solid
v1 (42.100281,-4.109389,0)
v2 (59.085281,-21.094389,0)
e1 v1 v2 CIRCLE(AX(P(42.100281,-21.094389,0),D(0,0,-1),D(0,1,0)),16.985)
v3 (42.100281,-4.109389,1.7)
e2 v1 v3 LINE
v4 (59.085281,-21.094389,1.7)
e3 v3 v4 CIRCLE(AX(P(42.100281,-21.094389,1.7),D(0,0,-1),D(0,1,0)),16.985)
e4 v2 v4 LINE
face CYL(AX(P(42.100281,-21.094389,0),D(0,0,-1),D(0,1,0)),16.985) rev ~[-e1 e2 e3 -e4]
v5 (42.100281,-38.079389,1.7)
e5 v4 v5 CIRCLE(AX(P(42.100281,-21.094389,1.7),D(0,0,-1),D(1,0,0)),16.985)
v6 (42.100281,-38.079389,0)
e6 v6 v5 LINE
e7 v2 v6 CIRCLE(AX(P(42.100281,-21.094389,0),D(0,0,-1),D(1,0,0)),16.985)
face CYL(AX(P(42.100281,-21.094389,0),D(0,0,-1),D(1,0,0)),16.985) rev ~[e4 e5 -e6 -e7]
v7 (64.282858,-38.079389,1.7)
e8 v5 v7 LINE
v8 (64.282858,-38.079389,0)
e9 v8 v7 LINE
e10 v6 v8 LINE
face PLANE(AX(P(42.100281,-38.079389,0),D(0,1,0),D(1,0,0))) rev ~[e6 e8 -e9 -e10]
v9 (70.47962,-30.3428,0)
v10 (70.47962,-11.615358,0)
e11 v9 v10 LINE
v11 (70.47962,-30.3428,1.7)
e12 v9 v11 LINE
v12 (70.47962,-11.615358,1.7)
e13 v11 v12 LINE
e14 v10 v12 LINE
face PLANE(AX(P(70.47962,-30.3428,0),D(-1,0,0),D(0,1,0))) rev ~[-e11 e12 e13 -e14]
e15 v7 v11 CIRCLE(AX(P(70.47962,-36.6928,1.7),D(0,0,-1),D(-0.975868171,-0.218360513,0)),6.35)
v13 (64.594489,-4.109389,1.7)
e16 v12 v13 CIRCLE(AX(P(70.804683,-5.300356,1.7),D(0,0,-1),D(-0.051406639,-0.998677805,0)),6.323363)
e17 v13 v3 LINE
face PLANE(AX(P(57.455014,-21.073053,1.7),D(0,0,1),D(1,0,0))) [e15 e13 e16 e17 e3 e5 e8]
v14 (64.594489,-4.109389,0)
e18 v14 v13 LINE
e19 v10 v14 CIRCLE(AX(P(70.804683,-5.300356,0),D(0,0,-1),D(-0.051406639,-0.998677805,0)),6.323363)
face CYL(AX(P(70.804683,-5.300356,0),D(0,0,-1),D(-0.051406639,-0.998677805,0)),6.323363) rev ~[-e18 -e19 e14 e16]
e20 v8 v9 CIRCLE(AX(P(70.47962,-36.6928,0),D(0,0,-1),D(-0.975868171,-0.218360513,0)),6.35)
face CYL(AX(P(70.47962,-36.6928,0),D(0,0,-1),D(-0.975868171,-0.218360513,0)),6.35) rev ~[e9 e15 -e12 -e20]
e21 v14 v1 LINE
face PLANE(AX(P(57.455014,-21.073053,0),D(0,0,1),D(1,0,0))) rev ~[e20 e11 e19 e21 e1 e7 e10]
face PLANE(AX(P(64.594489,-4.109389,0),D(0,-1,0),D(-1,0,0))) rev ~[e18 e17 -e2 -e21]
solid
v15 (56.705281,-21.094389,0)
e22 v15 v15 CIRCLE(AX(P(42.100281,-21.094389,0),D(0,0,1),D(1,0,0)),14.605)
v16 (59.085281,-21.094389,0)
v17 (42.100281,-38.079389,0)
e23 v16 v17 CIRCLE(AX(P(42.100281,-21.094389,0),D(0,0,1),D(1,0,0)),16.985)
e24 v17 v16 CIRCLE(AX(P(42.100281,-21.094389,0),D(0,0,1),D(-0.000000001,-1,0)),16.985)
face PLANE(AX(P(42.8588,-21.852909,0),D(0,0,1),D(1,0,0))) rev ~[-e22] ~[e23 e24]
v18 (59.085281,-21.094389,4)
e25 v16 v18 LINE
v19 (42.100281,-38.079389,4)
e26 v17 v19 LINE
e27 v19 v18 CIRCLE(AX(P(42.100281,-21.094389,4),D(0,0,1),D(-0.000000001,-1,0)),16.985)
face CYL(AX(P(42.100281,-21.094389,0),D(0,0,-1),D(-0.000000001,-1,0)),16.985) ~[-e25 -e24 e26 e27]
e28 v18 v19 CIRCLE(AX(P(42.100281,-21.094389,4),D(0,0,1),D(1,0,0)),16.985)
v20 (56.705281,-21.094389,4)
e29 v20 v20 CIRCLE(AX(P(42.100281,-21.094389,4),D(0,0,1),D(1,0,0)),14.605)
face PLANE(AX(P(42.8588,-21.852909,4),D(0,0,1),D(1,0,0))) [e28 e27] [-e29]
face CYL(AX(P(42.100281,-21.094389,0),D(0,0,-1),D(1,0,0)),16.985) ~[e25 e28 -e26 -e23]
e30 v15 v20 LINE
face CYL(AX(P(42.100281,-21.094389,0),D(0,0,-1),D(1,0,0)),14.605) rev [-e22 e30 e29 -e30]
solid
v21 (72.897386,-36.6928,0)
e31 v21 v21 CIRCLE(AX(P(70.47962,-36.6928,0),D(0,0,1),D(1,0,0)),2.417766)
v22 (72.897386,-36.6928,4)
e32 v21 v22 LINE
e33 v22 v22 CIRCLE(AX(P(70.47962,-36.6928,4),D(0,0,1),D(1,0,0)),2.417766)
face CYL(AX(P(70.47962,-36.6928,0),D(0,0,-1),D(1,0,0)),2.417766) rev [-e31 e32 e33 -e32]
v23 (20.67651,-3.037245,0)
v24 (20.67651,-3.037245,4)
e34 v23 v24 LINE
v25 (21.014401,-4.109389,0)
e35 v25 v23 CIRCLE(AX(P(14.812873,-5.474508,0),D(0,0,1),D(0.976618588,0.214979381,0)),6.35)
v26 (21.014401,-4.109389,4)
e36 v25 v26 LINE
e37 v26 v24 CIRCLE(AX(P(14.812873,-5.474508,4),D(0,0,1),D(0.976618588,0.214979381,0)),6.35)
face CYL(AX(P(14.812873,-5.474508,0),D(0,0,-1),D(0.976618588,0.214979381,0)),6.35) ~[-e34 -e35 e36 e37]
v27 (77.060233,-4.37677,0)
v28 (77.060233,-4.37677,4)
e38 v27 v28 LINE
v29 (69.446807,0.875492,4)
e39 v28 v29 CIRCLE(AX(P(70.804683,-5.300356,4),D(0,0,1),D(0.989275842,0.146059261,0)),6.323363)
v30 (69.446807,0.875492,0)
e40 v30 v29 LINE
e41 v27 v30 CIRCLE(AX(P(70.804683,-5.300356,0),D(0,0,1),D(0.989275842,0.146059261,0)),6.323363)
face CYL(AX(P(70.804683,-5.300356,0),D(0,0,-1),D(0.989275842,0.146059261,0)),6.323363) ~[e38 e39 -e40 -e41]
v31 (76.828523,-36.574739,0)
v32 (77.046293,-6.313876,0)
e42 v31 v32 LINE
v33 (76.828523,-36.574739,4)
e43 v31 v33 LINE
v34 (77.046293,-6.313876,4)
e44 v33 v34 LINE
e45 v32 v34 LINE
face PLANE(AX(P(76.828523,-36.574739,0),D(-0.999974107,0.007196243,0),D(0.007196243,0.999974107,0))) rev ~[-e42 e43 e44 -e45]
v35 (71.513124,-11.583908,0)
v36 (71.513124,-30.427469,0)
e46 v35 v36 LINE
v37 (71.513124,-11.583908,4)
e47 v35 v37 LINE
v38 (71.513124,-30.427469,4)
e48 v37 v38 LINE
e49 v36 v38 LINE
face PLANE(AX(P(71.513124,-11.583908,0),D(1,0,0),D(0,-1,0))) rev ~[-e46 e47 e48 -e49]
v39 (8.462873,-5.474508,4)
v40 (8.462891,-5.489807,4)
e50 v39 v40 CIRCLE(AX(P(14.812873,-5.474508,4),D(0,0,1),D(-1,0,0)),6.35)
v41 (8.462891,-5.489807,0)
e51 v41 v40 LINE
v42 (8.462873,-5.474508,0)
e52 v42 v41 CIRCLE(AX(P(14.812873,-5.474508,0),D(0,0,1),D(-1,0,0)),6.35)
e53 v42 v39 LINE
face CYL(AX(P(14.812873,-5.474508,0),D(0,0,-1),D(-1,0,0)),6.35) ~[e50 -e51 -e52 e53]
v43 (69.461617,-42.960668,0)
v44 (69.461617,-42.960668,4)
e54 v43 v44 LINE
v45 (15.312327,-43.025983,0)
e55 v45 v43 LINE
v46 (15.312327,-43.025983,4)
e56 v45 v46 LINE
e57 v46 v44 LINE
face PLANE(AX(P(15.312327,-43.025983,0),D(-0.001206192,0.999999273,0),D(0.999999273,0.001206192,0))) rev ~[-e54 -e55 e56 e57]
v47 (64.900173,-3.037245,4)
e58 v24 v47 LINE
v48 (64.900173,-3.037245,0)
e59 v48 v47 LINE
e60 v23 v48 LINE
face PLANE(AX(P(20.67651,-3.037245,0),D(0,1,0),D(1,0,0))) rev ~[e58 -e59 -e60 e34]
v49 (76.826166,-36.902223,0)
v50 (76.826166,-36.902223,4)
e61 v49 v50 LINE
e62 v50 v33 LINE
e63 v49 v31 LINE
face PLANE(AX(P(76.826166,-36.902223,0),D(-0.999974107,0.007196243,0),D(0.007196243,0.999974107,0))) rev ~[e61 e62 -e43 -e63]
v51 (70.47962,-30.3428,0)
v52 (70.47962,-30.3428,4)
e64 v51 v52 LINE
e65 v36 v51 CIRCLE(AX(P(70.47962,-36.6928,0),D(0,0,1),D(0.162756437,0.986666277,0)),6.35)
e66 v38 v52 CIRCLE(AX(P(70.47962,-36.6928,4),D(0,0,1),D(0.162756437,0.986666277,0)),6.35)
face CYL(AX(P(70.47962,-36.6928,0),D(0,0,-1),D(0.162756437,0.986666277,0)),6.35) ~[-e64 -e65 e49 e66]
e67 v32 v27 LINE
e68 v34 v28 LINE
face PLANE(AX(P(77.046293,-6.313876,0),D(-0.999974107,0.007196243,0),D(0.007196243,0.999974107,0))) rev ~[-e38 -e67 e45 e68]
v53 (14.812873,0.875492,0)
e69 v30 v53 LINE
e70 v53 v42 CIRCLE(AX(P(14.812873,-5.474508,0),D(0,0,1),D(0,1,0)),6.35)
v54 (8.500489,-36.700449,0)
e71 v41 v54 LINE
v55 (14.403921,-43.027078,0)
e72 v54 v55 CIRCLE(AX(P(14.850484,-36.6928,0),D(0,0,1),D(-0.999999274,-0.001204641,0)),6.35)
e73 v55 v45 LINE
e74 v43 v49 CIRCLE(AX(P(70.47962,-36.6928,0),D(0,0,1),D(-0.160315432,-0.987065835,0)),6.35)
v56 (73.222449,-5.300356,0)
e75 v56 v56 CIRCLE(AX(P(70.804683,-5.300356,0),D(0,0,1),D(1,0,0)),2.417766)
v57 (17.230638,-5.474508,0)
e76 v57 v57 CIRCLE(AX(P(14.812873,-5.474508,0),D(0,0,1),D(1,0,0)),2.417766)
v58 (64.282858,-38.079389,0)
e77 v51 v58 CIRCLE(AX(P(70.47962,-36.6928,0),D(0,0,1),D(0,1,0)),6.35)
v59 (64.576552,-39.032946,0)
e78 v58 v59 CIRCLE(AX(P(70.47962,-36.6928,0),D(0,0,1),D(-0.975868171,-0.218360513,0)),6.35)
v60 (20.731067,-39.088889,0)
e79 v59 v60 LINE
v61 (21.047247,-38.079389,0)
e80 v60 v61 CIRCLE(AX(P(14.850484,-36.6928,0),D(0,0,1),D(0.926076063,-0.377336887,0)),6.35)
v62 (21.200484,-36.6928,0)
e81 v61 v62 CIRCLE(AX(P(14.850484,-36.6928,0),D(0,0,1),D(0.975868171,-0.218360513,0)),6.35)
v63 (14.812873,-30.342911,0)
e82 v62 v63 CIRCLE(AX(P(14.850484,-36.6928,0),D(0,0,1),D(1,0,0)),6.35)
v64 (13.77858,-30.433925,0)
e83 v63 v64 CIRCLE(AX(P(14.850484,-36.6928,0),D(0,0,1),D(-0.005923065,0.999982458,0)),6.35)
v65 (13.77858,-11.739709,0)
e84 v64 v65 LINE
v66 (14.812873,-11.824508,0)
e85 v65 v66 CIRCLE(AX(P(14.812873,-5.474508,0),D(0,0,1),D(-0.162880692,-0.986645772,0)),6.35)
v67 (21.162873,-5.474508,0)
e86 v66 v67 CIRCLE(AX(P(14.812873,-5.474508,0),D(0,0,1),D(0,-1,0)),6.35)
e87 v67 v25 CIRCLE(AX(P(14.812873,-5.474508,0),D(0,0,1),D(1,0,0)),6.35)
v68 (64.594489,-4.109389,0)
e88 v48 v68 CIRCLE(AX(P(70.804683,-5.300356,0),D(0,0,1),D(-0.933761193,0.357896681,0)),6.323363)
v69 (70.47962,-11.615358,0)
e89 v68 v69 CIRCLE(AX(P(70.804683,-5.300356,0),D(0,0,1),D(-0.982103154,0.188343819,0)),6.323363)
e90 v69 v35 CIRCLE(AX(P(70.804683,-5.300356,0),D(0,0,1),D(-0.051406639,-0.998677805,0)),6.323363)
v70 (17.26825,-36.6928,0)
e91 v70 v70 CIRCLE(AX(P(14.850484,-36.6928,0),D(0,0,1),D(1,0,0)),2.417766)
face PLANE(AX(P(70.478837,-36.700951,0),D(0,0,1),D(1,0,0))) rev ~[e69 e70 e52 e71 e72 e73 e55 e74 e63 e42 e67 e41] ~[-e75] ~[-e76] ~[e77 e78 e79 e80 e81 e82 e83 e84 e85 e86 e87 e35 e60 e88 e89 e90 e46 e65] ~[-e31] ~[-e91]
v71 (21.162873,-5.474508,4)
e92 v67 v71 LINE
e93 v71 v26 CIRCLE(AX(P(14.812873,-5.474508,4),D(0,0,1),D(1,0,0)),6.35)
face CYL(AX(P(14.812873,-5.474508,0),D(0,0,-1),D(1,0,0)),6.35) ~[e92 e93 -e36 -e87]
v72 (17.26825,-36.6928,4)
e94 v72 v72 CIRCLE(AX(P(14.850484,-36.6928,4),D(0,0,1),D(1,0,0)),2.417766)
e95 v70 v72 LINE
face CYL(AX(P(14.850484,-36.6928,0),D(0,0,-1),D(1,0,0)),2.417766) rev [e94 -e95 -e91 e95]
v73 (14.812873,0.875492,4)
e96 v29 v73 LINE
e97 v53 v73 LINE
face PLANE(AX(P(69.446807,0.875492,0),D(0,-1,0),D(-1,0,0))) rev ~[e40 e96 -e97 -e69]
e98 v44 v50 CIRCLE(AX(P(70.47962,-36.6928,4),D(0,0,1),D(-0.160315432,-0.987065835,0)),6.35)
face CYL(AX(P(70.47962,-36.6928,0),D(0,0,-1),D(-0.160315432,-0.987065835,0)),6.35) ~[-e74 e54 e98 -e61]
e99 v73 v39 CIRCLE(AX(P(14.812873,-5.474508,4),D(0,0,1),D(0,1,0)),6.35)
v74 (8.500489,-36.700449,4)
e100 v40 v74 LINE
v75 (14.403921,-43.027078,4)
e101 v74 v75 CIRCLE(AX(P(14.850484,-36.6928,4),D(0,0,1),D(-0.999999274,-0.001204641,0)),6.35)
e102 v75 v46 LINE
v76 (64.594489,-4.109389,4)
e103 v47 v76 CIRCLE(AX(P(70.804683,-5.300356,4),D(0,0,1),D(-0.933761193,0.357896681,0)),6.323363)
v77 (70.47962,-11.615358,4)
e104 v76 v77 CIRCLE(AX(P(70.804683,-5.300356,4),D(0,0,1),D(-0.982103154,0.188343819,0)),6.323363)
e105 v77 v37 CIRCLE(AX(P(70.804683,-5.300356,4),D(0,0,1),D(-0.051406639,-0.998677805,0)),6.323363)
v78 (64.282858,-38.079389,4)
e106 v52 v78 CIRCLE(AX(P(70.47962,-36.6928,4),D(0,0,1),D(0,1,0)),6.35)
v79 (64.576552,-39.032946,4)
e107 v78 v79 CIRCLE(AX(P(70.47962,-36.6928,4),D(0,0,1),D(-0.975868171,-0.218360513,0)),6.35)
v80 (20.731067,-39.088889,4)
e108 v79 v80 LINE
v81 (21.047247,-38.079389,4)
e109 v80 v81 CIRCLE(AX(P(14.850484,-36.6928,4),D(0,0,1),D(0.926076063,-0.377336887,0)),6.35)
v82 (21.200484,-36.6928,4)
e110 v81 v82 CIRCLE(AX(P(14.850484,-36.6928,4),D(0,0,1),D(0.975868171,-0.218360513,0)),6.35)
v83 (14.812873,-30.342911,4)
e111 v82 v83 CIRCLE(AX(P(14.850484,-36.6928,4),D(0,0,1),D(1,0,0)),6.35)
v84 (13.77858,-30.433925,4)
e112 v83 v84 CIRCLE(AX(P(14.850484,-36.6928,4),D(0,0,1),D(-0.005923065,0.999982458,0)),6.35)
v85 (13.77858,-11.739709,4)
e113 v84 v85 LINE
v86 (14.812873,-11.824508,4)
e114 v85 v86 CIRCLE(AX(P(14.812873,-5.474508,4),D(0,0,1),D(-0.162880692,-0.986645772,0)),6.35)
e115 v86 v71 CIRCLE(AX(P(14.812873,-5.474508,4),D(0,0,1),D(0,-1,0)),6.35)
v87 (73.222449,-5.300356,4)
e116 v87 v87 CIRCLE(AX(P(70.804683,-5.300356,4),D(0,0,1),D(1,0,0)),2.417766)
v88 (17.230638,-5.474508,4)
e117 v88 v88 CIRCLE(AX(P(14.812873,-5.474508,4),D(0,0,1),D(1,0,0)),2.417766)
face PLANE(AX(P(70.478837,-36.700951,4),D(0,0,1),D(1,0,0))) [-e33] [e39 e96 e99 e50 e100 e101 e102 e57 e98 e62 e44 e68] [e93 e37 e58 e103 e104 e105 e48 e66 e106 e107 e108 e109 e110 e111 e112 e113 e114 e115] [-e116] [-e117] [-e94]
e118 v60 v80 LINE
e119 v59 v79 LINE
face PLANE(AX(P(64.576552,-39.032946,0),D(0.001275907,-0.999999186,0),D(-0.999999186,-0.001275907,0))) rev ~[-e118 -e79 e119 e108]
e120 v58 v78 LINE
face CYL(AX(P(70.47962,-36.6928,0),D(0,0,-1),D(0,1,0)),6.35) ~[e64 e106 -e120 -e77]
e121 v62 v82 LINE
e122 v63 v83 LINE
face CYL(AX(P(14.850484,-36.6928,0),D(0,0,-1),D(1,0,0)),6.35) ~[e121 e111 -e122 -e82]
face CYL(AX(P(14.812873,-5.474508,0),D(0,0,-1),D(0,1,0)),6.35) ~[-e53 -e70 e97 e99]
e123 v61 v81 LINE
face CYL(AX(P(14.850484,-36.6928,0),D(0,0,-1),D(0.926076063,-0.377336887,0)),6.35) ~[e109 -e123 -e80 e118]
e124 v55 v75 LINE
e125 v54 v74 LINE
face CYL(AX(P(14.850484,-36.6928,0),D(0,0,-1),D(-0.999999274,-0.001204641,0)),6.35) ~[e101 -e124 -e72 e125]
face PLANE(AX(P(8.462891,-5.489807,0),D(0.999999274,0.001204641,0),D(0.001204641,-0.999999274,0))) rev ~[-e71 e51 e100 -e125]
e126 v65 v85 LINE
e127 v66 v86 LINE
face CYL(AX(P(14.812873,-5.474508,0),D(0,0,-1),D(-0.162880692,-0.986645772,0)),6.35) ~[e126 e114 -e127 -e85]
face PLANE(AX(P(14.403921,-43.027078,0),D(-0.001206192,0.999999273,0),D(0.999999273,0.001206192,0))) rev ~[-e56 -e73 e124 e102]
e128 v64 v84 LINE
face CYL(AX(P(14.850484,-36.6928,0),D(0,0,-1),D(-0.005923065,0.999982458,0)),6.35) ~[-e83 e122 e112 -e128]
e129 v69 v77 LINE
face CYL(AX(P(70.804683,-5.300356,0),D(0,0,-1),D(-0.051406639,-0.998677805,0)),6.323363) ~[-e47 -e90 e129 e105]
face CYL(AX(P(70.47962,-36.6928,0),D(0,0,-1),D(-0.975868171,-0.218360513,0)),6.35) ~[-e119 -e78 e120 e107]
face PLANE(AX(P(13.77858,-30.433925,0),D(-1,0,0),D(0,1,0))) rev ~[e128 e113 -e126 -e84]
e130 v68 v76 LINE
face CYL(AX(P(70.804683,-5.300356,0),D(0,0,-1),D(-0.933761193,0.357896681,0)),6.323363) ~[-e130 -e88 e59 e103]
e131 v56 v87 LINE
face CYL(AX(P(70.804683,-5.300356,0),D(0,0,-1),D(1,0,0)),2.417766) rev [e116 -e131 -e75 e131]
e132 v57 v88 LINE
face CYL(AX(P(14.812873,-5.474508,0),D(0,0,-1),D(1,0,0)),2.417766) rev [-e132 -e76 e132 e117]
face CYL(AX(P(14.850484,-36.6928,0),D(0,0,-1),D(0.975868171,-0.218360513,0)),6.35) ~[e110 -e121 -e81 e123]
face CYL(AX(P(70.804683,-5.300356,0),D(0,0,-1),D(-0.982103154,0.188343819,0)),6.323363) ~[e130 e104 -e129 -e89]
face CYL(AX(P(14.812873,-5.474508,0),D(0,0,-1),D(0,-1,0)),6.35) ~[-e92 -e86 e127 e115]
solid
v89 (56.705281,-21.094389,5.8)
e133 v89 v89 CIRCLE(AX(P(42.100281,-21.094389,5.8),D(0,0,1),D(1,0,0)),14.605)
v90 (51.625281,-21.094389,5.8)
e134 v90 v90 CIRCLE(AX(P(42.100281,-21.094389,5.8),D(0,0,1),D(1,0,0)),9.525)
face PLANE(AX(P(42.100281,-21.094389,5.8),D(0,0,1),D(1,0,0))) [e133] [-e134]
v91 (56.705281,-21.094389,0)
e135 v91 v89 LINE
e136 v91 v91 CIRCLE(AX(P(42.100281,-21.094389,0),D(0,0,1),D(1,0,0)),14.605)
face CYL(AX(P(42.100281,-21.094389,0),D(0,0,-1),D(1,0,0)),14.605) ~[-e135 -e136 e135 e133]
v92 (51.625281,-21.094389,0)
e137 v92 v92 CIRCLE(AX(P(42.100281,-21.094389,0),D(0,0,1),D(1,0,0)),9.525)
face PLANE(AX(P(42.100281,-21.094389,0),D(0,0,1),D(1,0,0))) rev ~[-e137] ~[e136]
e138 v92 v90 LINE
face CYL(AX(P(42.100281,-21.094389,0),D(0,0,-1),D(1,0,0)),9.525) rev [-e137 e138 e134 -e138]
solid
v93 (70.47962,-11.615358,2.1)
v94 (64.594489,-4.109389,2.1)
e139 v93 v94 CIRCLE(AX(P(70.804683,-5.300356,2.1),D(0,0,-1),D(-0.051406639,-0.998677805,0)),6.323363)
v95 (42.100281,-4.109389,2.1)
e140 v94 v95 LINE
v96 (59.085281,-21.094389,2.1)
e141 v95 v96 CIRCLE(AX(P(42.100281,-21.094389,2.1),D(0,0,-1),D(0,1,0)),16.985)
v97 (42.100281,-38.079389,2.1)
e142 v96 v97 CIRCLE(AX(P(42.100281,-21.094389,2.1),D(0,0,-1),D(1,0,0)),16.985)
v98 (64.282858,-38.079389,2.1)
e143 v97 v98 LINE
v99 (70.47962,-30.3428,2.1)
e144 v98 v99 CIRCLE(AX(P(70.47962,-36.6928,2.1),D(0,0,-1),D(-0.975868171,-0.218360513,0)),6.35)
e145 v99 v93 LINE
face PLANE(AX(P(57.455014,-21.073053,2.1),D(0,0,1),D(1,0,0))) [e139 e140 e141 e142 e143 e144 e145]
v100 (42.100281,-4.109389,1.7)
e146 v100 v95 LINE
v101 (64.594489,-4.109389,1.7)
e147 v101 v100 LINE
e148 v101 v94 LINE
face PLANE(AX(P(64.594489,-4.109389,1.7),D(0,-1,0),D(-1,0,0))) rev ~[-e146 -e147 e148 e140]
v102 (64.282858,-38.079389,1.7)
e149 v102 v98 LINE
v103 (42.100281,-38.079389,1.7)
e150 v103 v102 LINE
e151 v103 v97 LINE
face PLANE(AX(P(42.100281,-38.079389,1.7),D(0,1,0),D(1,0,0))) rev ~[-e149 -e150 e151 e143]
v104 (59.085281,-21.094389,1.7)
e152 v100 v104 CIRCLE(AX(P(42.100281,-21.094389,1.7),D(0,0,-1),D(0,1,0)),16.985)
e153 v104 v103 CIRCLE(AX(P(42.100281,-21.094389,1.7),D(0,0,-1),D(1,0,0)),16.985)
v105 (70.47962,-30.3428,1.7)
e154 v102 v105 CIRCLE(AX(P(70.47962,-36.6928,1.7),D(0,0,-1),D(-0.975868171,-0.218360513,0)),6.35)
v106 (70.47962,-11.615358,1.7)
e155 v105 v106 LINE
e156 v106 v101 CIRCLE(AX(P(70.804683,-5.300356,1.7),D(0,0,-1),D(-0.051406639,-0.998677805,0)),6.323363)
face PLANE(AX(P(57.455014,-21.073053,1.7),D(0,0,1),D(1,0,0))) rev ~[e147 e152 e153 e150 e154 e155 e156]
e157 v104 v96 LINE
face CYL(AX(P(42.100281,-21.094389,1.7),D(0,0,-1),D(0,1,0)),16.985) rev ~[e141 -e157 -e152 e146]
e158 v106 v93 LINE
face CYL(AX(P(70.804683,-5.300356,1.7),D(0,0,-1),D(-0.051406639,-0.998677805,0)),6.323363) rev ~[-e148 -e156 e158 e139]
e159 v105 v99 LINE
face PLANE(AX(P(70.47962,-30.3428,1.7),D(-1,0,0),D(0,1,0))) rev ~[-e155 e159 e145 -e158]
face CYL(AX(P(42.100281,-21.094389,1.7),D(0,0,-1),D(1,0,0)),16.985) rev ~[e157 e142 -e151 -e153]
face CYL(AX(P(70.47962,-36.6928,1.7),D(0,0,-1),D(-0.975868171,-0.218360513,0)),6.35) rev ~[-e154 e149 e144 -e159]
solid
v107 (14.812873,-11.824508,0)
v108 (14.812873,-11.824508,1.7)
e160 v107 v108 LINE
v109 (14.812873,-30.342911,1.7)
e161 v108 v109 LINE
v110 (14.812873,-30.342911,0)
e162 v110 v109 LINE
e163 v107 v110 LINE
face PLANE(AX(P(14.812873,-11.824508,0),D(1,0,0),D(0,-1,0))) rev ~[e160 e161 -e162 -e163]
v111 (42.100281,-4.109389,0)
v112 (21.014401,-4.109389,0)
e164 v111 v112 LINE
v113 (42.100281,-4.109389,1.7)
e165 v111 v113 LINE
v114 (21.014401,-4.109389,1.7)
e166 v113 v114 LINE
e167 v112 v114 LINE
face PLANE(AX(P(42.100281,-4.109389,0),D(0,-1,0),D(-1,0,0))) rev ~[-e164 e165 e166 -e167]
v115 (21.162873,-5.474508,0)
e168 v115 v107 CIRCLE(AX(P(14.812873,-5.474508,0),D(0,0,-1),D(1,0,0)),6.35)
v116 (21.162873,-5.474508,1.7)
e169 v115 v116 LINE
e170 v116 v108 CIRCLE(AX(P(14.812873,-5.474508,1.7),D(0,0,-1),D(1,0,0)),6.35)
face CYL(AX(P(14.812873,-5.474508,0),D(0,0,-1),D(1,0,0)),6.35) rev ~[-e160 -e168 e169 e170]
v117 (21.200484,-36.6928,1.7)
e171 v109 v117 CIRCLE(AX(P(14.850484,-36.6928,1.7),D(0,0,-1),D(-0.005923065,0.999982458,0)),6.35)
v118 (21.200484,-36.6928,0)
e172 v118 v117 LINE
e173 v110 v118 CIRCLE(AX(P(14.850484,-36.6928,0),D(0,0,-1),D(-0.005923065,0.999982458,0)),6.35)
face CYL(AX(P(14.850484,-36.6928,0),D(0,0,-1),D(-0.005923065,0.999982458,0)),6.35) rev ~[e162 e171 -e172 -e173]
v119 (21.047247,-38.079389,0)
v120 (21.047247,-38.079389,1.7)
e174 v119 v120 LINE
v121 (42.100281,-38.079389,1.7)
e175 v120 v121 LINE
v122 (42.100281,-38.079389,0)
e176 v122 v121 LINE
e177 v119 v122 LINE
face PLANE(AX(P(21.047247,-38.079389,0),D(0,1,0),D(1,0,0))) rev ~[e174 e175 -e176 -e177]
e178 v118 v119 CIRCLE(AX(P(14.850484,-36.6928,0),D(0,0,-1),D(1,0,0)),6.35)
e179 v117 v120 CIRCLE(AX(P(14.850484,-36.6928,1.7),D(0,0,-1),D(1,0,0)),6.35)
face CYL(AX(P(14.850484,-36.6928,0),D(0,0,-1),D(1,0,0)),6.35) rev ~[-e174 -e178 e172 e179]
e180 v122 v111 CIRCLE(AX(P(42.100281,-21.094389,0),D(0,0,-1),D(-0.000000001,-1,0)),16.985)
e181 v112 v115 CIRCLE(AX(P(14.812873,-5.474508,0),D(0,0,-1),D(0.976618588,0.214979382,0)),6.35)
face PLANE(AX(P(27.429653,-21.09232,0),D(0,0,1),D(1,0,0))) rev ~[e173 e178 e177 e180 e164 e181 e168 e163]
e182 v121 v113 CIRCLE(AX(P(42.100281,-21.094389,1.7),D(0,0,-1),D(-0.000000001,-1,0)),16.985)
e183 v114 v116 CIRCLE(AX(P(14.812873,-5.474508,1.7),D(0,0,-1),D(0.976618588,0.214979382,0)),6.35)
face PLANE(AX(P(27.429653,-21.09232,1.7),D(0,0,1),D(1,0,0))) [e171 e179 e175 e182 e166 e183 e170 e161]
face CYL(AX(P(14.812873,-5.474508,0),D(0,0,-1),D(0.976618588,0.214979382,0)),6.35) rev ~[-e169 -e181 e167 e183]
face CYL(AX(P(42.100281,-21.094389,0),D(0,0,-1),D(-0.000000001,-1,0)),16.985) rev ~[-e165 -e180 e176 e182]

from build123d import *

# Parameters (mm, degrees)
F0_R     = 14.605
F0_R_2   = 9.525
F2_DEPTH = 5.8
F3_DEPTH = 4
F0_R_3   = 2.417765634
F4_DEPTH = 4
F5_DEPTH = 1.7
F6_DEPTH = 0.4


# Not quite as in the source:
# - a feature of the source that left no trace in its solid (it failed there, or was rolled back) is left out


with BuildPart() as f2:
    # F0 (on Top) → F2 (new body)
    with BuildSketch(Plane.XY):
        with Locations((42.1002805233, -21.0943892598)):
            Circle(F0_R)
        with Locations((42.1002805233, -21.0943892598)):
            Circle(F0_R_2, mode=Mode.SUBTRACT)
    extrude(amount=F2_DEPTH)


with BuildPart() as f3:
    # F0 (on Top) → F3 (new body)
    with BuildSketch(Plane.XY):
        with BuildLine():
            ThreePointArc((59.0852805233, -21.0943892598), (54.1104892018, -9.0841805814), (42.1002805233, -4.1093892598))
            ThreePointArc((42.1002805233, -4.1093892598), (25.1152805233, -21.0943892491), (42.1002805018, -38.0793892598))
            ThreePointArc((42.1002805018, -38.0793892598), (54.1104891942, -33.1045979459), (59.0852805233, -21.0943892598))
        make_face()
        with Locations((42.1002805233, -21.0943892598)):
            Circle(F0_R, mode=Mode.SUBTRACT)
    extrude(amount=F3_DEPTH)


with BuildPart() as f4:
    # F0 (on Top) → F4 (new body)
    with BuildSketch(Plane.XY):
        with BuildLine():
            ThreePointArc((70.4796204309, -30.3428000003), (65.5234454038, -32.7230608274), (64.2828575481, -38.0793892598))
            ThreePointArc((64.2828575481, -38.0793892598), (64.4109470876, -38.56194522), (64.5765521859, -39.0329464262))
            ThreePointArc((64.5765521859, -39.0329464262), (66.5006688013, -41.6415820656), (69.4616174351, -42.960668051))
            ThreePointArc((69.4616174351, -42.960668051), (74.513790796, -41.596672905), (76.8261661024, -36.9022231109))
            Line((76.8261661024, -36.9022231109), (76.8285228203, -36.5747387894))
            ThreePointArc((76.8285228203, -36.5747387894), (75.2829744428, -32.5394531286), (71.5131238103, -30.4274691419))
            ThreePointArc((71.5131238103, -30.4274691419), (70.9981033377, -30.3640026837), (70.4796204309, -30.3428000003))
        make_face()
        with Locations((70.4796204309, -36.6928000003)):
            Circle(F0_R_3, mode=Mode.SUBTRACT)
        with BuildLine():
            ThreePointArc((77.0462929913, -6.3138761602), (75.1657734813, -9.8791990856), (71.5131238103, -11.5839077326))
            Line((71.5131238103, -11.5839077326), (71.5131238103, -30.4274691419))
            ThreePointArc((71.5131238103, -30.4274691419), (75.2829744428, -32.5394531286), (76.8285228203, -36.5747387894))
            Line((76.8285228203, -36.5747387894), (77.0462929913, -6.3138761602))
        make_face()
        with BuildLine():
            ThreePointArc((69.4468072263, 0.8754916674), (66.6800084328, -0.5074468562), (64.9001725386, -3.0372450128))
            ThreePointArc((64.9001725386, -3.0372450128), (64.7236558931, -3.5665671194), (64.5944887824, -4.1093892598))
            ThreePointArc((64.5944887824, -4.1093892598), (65.8285113374, -9.2019743288), (70.4796204309, -11.6153575458))
            ThreePointArc((70.4796204309, -11.6153575458), (70.9970160236, -11.6207925725), (71.5131238103, -11.5839077326))
            ThreePointArc((71.5131238103, -11.5839077326), (75.1657734813, -9.8791990856), (77.0462929913, -6.3138761602))
            Line((77.0462929913, -6.3138761602), (77.0602332407, -4.3767698617))
            ThreePointArc((77.0602332407, -4.3767698617), (74.3954165151, -0.0954010996), (69.4468072263, 0.8754916674))
        make_face()
        with Locations((70.8046832573, -5.3003555452)):
            Circle(F0_R_3, mode=Mode.SUBTRACT)
        with BuildLine():
            ThreePointArc((14.8128727451, 0.8754916674), (18.3374917259, -0.1925048263), (20.6765104821, -3.0372450128))
            Line((20.6765104821, -3.0372450128), (64.9001725386, -3.0372450128))
            ThreePointArc((64.9001725386, -3.0372450128), (66.6800084328, -0.5074468562), (69.4468072263, 0.8754916674))
            Line((69.4468072263, 0.8754916674), (14.8128727451, 0.8754916674))
        make_face()
        with BuildLine():
            ThreePointArc((14.8128727451, -11.8245083326), (19.3030008056, -9.9646363931), (21.1628727451, -5.4745083326))
            ThreePointArc((21.1628727451, -5.4745083326), (21.1256456301, -4.7879236676), (21.0144007759, -4.1093892598))
            ThreePointArc((21.0144007759, -4.1093892598), (20.8692272239, -3.5658254287), (20.6765104821, -3.0372450128))
            ThreePointArc((20.6765104821, -3.0372450128), (18.3374917259, -0.1925048263), (14.8128727451, 0.8754916674))
            ThreePointArc((14.8128727451, 0.8754916674), (10.3227446846, -0.984380272), (8.4628727451, -5.4745083326))
            ThreePointArc((8.4628727451, -5.4745083326), (9.9708557742, -9.5827161722), (13.7785803527, -11.7397089875))
            ThreePointArc((13.7785803527, -11.7397089875), (14.2939913324, -11.8032729892), (14.8128727451, -11.8245083326))
        make_face()
        with Locations((14.8128727451, -5.4745083326)):
            Circle(F0_R_3, mode=Mode.SUBTRACT)
        with BuildLine():
            ThreePointArc((13.7785803527, -11.7397089875), (9.9708557742, -9.5827161722), (8.4628727451, -5.4745083326))
            Line((8.4628727451, -5.4745083326), (8.5004888147, -36.7004494693))
            ThreePointArc((8.5004888147, -36.7004494693), (9.9936868257, -32.6020764465), (13.7785803527, -30.4339245321))
            Line((13.7785803527, -30.4339245321), (13.7785803527, -11.7397089875))
        make_face()
        with BuildLine():
            ThreePointArc((21.2004842073, -36.6928000003), (19.3272948586, -32.1893939124), (14.8128727451, -30.3429113889))
            ThreePointArc((14.8128727451, -30.3429113889), (14.2938632343, -30.3672428634), (13.7785803527, -30.4339245321))
            ThreePointArc((13.7785803527, -30.4339245321), (9.9936868257, -32.6020764465), (8.5004888147, -36.7004494693))
            ThreePointArc((8.5004888147, -36.7004494693), (10.207762887, -41.024963287), (14.4039206737, -43.0270782552))
            Line((14.4039206737, -43.0270782552), (15.3123271424, -43.0259825418))
            ThreePointArc((15.3123271424, -43.0259825418), (18.5830125205, -41.8299910996), (20.7310672048, -39.0888892326))
            ThreePointArc((20.7310672048, -39.0888892326), (20.9102155072, -38.5907348182), (21.0472470901, -38.0793892598))
            ThreePointArc((21.0472470901, -38.0793892598), (21.1620586664, -37.390315482), (21.2004842073, -36.6928000003))
        make_face()
        with Locations((14.8504842073, -36.6928000003)):
            Circle(F0_R_3, mode=Mode.SUBTRACT)
        with BuildLine():
            Line((64.5765521859, -39.0329464262), (20.7310672048, -39.0888892326))
            ThreePointArc((20.7310672048, -39.0888892326), (18.5830125205, -41.8299910996), (15.3123271424, -43.0259825418))
            Line((15.3123271424, -43.0259825418), (69.4616174351, -42.960668051))
            ThreePointArc((69.4616174351, -42.960668051), (66.5006688013, -41.6415820656), (64.5765521859, -39.0329464262))
        make_face()
    extrude(amount=F4_DEPTH)


with BuildPart() as f5:
    # F0 (on Top) → F5 (new body)
    with BuildSketch(Plane.XY):
        with BuildLine():
            ThreePointArc((21.0144007759, -4.1093892598), (21.1256456301, -4.7879236676), (21.1628727451, -5.4745083326))
            ThreePointArc((21.1628727451, -5.4745083326), (19.3030008056, -9.9646363931), (14.8128727451, -11.8245083326))
            Line((14.8128727451, -11.8245083326), (14.8128727451, -30.3429113889))
            ThreePointArc((14.8128727451, -30.3429113889), (19.3272948586, -32.1893939124), (21.2004842073, -36.6928000003))
            ThreePointArc((21.2004842073, -36.6928000003), (21.1620586664, -37.390315482), (21.0472470901, -38.0793892598))
            Line((21.0472470901, -38.0793892598), (42.1002805018, -38.0793892598))
            ThreePointArc((42.1002805018, -38.0793892598), (25.1152805233, -21.0943892491), (42.1002805233, -4.1093892598))
            Line((42.1002805233, -4.1093892598), (21.0144007759, -4.1093892598))
        make_face()
    extrude(amount=F5_DEPTH)


with BuildPart() as f5b:
    # F0 (on Top) → F5, piece 2 (new body)
    with BuildSketch(Plane.XY):
        with BuildLine():
            Line((64.5944887824, -4.1093892598), (42.1002805233, -4.1093892598))
            ThreePointArc((42.1002805233, -4.1093892598), (54.1104892018, -9.0841805814), (59.0852805233, -21.0943892598))
            ThreePointArc((59.0852805233, -21.0943892598), (54.1104891942, -33.1045979459), (42.1002805018, -38.0793892598))
            Line((42.1002805018, -38.0793892598), (64.2828575481, -38.0793892598))
            ThreePointArc((64.2828575481, -38.0793892598), (65.5234454038, -32.7230608274), (70.4796204309, -30.3428000003))
            Line((70.4796204309, -30.3428000003), (70.4796204309, -11.6153575458))
            ThreePointArc((70.4796204309, -11.6153575458), (65.8285113374, -9.2019743288), (64.5944887824, -4.1093892598))
        make_face()
    extrude(amount=F5_DEPTH)


with BuildPart() as f6:
    # F6 (new): a face of the model
    f6_faces = [f5b.part.faces().sort_by_distance(p)[0] for p in [
        (61.5462800448, -20.981916528, 1.7),
    ]]
    extrude(f6_faces, amount=F6_DEPTH)


solid = Compound([f2.part, f3.part, f4.part, f5.part, f5b.part, f6.part])
